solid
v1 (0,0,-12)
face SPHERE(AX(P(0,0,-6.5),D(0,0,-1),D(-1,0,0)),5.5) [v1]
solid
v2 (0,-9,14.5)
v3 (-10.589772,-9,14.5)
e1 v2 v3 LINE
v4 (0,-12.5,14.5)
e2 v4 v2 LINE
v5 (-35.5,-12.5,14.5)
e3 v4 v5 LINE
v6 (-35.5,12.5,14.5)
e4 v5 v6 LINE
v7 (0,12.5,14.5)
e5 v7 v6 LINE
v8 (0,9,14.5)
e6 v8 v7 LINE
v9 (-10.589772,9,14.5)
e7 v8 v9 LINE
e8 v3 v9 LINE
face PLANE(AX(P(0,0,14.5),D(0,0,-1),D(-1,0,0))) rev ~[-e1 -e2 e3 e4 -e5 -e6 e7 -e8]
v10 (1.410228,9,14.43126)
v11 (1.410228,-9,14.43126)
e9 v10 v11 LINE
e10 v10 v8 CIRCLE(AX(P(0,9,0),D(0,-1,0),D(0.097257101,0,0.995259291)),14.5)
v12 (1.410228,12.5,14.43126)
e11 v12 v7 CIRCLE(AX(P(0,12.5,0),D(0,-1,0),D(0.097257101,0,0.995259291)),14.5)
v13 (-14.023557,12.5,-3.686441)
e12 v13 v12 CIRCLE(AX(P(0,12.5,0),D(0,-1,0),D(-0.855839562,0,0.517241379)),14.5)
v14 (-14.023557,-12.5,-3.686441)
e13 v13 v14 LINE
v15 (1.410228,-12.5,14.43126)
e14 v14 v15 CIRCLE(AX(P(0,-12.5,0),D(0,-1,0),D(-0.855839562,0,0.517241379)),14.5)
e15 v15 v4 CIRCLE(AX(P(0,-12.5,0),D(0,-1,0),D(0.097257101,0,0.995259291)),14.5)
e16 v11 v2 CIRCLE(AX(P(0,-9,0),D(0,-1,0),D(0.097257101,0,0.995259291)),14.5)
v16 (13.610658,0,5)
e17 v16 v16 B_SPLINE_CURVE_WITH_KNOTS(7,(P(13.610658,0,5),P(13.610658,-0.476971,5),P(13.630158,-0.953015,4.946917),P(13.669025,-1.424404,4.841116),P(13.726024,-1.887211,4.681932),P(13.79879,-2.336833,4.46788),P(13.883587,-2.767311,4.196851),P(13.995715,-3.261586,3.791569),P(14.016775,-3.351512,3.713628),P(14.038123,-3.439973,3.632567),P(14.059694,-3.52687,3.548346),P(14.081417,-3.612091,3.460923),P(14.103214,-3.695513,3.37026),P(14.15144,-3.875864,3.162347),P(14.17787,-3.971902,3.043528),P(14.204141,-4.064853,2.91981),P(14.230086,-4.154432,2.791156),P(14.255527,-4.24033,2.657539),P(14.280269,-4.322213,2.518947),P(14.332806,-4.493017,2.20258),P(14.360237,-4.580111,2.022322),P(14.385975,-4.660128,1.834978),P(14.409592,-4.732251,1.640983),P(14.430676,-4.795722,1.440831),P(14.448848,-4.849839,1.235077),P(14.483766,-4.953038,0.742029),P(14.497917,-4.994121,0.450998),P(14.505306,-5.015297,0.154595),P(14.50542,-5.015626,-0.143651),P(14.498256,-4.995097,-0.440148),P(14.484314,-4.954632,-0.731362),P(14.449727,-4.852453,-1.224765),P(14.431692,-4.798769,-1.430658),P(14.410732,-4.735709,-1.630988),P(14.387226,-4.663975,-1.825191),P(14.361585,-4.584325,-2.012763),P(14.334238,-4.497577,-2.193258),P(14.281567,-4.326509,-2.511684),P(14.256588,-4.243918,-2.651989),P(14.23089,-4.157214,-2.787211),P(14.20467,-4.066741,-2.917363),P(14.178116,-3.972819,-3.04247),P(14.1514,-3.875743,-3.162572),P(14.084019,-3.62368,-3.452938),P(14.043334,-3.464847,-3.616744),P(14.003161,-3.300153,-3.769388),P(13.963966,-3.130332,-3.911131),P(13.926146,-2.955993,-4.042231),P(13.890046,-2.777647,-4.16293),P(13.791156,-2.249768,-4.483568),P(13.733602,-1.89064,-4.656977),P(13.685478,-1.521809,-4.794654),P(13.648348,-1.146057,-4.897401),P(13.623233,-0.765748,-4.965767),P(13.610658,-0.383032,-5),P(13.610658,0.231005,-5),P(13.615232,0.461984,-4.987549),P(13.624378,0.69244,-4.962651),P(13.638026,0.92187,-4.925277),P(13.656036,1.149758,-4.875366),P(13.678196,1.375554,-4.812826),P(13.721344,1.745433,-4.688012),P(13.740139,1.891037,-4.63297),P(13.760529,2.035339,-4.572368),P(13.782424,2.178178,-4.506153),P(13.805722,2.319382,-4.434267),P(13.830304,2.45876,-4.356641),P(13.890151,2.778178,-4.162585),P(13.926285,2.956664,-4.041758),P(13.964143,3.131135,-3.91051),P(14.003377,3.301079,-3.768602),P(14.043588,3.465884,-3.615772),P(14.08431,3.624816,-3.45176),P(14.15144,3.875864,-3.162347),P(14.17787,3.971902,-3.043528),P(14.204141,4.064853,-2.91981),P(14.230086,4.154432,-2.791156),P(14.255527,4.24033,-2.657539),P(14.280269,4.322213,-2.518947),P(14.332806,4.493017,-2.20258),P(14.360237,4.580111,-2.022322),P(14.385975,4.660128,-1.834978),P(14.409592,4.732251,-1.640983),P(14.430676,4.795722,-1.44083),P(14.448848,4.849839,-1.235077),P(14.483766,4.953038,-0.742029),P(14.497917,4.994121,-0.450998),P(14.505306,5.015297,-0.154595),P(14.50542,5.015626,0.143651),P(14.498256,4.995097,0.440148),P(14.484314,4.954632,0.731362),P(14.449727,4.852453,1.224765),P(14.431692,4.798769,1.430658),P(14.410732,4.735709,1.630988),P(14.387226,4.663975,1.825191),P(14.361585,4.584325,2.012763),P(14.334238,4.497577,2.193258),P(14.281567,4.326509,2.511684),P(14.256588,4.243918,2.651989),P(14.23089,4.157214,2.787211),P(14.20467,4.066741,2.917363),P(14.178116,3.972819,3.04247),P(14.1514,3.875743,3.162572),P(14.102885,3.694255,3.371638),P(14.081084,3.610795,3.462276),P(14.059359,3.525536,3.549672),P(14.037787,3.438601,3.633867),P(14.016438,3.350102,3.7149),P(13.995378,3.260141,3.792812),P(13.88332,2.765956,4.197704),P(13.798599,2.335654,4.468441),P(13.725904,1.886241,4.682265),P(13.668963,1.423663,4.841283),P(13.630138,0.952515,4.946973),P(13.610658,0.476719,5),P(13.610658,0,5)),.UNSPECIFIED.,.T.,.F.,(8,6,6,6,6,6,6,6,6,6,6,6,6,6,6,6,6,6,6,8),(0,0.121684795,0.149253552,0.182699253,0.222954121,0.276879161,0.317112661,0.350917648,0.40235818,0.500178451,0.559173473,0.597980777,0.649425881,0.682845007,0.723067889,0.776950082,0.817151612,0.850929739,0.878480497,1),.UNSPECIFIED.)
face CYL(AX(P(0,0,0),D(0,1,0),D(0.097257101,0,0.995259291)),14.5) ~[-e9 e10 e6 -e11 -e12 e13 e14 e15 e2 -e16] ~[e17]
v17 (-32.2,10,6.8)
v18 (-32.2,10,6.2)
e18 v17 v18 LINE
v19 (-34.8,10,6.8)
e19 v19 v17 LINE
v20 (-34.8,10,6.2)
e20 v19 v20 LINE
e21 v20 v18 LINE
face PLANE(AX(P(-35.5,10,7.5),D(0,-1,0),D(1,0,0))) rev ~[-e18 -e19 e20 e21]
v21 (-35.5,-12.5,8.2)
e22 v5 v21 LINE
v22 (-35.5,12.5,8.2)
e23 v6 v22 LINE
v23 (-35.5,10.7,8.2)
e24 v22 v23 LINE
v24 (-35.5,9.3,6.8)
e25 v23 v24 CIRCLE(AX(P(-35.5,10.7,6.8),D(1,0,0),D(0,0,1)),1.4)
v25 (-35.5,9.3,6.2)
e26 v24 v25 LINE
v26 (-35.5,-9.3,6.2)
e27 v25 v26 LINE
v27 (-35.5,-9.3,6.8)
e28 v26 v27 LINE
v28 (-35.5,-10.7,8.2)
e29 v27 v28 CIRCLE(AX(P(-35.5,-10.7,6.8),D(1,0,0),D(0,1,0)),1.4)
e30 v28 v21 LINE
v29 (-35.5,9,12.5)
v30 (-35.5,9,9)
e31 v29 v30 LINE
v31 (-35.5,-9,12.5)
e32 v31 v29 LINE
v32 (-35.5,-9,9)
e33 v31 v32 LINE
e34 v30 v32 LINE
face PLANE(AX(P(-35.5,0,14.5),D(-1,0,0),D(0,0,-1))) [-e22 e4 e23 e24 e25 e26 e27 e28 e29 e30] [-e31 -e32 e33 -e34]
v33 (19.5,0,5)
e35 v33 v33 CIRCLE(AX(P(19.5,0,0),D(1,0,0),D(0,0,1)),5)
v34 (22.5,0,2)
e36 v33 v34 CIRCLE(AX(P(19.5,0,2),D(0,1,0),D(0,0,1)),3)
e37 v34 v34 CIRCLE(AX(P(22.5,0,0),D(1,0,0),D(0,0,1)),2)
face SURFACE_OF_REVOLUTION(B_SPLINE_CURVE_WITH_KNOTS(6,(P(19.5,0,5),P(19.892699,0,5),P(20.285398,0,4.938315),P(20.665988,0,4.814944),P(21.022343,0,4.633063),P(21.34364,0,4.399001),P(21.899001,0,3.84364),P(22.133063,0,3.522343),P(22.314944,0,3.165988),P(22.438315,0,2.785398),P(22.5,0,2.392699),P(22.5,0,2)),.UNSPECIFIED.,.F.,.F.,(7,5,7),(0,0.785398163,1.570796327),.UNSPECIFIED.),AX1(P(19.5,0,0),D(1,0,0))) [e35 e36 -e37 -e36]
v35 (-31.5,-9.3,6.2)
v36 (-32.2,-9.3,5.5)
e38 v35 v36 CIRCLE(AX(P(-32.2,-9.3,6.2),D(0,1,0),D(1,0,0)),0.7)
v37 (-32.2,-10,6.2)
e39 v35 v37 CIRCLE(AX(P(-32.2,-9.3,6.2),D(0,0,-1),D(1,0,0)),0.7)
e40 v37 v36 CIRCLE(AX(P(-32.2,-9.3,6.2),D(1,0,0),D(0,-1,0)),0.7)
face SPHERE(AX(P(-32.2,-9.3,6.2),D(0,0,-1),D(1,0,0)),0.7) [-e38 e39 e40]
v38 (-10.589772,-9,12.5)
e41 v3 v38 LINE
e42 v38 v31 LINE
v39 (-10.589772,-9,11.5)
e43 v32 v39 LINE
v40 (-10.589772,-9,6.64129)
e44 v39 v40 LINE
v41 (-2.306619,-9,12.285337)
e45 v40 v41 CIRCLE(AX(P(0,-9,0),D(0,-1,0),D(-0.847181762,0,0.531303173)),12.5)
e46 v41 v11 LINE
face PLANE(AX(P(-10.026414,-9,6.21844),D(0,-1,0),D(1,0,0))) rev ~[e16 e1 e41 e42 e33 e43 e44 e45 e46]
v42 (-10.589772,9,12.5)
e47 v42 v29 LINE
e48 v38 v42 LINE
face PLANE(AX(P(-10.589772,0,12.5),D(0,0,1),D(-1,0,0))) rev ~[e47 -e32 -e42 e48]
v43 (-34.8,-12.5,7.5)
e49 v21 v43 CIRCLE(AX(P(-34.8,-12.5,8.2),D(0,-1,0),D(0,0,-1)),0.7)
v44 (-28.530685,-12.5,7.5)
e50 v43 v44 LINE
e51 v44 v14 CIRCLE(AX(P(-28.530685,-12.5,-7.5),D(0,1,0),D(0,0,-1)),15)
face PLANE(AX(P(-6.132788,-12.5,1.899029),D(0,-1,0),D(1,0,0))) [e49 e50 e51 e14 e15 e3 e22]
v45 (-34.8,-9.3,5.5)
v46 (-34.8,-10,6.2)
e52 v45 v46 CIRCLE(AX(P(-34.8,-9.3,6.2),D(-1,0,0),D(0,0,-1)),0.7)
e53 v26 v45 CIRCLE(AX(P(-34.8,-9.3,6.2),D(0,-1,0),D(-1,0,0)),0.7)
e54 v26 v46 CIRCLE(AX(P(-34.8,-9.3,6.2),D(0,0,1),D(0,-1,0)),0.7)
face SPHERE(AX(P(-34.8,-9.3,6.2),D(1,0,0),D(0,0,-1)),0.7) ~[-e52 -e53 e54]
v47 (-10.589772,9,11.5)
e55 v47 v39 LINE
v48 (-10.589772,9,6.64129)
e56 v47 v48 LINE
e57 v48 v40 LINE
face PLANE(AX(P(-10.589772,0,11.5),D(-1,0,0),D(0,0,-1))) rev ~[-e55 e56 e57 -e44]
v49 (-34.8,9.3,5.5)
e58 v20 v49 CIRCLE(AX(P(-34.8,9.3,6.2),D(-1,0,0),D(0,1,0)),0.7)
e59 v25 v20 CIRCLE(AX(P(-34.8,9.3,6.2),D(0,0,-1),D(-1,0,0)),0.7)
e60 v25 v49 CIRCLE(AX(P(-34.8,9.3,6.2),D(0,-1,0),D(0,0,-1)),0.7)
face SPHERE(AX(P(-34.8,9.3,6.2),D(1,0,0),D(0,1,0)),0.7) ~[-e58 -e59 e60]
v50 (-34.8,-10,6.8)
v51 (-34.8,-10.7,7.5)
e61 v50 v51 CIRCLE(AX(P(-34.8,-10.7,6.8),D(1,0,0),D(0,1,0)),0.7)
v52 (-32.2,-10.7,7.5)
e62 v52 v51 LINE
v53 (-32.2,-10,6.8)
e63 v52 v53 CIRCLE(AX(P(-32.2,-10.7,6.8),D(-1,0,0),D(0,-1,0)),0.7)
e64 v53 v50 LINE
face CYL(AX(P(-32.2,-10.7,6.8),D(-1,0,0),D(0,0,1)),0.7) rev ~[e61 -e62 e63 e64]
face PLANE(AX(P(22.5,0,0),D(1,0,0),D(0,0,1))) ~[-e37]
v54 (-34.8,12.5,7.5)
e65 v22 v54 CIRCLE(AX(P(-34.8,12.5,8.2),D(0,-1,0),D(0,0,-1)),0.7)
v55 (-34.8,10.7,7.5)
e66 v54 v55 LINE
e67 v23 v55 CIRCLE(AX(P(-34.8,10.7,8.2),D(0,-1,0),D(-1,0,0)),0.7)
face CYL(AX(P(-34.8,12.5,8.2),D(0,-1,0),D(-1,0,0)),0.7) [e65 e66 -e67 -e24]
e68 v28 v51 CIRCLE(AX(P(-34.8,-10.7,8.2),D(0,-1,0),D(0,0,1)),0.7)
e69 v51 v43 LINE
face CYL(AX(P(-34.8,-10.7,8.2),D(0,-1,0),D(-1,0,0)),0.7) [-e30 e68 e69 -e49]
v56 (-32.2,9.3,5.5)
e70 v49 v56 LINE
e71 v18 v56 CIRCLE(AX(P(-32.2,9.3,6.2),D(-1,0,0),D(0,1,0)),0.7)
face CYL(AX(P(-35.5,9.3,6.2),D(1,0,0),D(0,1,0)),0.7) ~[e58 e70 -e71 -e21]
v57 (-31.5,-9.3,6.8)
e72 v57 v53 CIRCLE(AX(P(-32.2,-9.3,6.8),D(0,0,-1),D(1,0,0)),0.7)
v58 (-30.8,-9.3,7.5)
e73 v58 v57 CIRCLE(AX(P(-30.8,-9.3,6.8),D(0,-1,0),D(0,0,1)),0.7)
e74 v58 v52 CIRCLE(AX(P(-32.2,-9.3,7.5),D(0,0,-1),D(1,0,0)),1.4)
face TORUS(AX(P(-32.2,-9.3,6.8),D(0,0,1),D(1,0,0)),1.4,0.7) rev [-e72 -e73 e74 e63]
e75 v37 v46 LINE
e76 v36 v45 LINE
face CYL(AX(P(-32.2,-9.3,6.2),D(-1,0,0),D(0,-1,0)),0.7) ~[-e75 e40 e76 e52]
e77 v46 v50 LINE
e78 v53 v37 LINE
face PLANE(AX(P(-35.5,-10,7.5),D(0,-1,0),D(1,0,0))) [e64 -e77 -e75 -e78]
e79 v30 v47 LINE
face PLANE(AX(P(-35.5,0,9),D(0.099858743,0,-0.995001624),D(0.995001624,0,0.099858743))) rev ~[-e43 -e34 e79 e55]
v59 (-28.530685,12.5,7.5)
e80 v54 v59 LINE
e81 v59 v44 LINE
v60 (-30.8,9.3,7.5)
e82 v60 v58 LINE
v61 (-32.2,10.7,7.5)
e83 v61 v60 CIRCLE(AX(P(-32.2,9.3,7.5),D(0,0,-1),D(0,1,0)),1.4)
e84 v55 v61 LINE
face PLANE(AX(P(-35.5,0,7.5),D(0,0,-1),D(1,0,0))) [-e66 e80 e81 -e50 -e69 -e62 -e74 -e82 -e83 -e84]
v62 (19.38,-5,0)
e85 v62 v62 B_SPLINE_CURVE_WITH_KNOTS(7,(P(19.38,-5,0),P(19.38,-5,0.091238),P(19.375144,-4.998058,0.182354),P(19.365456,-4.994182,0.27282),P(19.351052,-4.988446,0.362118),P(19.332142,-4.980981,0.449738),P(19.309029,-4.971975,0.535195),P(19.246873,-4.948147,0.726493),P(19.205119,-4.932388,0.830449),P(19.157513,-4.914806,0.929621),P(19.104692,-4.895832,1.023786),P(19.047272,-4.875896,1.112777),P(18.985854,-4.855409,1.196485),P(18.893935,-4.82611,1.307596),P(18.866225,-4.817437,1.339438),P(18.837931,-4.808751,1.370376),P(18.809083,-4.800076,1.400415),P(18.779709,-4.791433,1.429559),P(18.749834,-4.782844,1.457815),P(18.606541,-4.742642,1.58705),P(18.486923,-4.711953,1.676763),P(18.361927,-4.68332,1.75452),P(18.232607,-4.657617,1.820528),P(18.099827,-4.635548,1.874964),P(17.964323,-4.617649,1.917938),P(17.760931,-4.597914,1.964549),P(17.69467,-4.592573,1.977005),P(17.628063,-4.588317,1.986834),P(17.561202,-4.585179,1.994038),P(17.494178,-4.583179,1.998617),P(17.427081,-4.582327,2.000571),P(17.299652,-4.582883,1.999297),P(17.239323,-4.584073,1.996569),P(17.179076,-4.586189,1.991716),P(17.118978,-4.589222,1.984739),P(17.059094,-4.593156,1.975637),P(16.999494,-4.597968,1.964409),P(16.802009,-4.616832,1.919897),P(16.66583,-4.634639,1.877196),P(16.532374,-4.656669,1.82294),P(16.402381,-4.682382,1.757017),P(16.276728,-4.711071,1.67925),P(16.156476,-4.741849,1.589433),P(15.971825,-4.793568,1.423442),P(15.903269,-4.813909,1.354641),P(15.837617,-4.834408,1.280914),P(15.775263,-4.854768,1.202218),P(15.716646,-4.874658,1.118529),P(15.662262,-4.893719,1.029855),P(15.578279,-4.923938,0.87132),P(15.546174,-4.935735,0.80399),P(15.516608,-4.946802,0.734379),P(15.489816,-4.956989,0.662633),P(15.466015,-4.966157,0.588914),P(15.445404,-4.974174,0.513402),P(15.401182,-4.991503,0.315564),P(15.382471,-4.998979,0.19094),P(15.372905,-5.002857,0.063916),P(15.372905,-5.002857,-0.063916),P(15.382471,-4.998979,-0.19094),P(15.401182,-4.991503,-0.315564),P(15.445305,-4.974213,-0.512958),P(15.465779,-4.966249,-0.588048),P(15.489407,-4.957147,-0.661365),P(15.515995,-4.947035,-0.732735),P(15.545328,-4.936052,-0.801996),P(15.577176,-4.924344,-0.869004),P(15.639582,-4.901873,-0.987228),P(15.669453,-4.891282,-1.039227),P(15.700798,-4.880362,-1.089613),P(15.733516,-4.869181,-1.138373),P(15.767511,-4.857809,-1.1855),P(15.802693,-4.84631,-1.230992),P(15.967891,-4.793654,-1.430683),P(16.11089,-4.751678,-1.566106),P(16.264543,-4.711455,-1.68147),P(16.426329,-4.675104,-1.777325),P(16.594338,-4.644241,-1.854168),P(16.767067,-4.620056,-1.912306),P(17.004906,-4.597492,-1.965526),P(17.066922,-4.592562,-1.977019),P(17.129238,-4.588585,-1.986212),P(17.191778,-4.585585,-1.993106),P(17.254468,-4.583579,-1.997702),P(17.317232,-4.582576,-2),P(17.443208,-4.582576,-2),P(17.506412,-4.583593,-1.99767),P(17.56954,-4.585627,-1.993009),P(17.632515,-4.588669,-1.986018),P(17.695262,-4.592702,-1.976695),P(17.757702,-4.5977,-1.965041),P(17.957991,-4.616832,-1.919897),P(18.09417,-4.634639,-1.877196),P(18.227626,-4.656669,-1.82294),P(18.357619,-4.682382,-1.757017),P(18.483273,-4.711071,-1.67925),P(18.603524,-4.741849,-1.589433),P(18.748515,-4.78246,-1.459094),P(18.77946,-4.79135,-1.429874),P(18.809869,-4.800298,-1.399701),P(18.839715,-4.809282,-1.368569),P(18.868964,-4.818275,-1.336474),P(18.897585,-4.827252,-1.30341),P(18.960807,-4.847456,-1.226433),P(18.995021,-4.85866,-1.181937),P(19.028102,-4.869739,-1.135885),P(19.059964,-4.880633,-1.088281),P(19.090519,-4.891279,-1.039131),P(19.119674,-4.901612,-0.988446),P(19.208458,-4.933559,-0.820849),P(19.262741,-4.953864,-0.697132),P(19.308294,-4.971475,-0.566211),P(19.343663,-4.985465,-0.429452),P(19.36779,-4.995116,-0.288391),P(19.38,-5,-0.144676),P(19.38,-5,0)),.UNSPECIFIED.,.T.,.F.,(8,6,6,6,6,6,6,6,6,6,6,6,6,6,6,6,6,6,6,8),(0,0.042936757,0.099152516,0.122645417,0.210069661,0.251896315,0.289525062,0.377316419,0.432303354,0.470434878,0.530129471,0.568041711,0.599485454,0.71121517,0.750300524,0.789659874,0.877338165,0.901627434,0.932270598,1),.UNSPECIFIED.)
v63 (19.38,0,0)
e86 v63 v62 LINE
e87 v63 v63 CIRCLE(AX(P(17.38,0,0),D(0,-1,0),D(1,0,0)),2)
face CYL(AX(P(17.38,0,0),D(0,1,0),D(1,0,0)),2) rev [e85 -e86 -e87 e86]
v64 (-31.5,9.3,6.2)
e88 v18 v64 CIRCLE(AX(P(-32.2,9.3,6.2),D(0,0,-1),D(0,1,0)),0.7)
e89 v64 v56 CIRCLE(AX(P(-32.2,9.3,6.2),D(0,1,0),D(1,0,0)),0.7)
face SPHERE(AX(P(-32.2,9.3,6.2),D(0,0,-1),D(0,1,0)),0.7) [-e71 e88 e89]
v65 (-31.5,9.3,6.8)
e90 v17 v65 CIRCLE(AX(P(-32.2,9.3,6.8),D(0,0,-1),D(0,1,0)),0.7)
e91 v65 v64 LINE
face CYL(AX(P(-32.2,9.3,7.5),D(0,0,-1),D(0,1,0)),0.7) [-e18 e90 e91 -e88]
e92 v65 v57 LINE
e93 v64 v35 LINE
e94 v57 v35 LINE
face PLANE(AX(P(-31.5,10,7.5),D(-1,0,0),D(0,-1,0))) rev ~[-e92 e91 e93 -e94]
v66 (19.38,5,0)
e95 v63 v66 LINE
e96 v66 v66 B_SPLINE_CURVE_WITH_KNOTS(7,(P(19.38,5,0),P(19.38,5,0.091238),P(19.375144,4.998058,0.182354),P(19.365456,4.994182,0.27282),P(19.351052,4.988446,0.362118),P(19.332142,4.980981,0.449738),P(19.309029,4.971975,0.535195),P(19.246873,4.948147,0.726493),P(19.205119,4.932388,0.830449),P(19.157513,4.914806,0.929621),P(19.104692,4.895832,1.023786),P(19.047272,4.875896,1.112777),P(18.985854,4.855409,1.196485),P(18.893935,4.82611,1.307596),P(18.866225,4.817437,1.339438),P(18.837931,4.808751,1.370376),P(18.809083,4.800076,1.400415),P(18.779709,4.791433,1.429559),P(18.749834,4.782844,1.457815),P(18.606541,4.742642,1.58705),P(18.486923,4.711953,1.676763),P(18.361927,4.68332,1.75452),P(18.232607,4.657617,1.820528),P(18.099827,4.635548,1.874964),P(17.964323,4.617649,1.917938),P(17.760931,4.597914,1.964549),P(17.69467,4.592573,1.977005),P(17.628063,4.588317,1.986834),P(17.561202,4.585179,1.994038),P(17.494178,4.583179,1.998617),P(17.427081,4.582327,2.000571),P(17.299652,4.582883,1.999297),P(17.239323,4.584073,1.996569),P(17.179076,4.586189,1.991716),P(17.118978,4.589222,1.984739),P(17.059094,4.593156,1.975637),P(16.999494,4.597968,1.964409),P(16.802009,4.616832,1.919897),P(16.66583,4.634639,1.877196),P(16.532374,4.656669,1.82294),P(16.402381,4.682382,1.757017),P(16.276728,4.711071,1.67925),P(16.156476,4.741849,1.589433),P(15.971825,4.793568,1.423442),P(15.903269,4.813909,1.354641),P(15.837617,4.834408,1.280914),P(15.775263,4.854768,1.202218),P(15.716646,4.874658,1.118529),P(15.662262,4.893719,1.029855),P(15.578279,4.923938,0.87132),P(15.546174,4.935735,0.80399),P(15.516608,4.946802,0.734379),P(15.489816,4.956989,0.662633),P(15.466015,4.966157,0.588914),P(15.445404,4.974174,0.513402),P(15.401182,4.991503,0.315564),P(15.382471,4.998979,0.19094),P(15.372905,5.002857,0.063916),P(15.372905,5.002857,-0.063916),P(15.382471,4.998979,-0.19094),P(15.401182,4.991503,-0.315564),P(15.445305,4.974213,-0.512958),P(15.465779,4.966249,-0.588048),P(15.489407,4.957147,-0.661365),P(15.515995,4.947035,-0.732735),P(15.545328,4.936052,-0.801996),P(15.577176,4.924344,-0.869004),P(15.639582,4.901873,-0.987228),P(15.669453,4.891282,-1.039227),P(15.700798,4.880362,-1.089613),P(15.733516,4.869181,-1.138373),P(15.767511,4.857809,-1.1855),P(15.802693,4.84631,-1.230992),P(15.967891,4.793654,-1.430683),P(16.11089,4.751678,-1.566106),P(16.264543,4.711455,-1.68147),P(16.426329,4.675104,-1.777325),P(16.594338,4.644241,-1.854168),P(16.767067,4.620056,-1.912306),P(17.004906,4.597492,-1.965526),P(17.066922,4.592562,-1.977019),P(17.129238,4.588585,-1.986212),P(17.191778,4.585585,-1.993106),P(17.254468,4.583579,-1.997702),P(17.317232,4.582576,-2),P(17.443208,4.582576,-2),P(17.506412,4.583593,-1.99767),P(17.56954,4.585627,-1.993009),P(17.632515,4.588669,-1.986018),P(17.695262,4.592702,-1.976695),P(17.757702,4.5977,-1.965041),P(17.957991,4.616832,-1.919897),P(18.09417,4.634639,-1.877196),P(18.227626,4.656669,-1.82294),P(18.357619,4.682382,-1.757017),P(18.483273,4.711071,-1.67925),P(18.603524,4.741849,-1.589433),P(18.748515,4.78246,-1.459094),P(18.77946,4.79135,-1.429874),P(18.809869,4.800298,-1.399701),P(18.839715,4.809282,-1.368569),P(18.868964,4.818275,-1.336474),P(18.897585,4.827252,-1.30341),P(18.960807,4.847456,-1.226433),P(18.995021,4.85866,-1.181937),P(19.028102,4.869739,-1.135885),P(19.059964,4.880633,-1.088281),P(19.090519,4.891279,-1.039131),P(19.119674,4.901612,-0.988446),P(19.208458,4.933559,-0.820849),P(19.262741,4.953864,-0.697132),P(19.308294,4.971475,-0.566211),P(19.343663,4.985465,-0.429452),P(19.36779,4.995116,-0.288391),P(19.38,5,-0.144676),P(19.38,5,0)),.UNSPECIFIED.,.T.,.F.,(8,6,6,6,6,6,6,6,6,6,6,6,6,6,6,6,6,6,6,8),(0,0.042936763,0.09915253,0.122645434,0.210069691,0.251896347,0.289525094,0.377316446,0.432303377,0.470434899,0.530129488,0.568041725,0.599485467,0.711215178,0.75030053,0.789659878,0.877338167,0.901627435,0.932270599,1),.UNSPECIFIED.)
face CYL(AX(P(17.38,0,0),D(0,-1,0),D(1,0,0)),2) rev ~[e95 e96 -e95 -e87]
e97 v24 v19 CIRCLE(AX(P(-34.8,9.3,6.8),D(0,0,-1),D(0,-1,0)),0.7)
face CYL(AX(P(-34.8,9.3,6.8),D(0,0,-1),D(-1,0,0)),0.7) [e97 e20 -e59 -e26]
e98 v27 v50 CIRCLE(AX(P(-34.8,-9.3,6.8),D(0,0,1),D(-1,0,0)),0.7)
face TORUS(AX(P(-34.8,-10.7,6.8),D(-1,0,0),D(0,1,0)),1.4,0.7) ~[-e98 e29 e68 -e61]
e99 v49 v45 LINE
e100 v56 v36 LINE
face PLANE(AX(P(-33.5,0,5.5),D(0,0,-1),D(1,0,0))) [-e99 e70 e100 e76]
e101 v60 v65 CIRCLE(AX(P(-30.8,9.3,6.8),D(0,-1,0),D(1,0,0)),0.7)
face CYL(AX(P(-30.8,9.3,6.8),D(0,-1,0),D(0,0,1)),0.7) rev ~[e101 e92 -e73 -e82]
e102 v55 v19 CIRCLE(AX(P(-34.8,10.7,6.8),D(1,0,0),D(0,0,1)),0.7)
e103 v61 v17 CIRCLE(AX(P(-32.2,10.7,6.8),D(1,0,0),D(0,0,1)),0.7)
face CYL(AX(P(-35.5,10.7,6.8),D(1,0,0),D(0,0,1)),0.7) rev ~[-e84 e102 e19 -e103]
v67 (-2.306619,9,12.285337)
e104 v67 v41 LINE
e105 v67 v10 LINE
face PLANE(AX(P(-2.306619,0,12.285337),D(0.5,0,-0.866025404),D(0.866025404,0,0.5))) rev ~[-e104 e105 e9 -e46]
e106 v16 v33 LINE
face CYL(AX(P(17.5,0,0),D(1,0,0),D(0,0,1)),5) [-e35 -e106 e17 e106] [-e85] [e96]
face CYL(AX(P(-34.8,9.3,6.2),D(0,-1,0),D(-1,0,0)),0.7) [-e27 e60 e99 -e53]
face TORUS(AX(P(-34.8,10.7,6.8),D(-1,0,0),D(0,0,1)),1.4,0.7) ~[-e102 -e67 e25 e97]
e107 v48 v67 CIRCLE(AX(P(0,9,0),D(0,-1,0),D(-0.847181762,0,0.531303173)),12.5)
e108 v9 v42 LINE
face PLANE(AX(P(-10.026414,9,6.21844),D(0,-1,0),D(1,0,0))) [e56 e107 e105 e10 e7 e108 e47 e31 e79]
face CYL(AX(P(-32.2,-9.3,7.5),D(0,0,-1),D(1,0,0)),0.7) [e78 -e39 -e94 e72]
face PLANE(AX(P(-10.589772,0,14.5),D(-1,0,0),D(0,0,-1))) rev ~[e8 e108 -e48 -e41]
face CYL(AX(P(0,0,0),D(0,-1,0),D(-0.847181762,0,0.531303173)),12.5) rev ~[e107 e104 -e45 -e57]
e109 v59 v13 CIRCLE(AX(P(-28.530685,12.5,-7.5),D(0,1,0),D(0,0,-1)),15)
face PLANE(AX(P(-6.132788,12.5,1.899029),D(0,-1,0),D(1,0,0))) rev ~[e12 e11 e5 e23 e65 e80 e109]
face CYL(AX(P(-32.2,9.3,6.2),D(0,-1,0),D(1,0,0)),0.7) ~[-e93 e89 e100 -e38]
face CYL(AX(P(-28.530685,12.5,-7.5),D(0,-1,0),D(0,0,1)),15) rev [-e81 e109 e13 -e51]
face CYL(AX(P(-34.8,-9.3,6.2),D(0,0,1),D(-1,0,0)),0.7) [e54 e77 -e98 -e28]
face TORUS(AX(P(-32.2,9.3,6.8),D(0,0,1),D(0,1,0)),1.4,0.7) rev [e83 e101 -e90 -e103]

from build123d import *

# Parameters (mm, degrees)
F0_W          = 24.9102279718
F0_H          = 2
F1_DEPTH      = 12.5
F2_DEPTH      = 9
F5_W          = 10
F5_H          = 5
F7_R          = 3
F8_R          = 2
F9_DEPTH      = 12.5010001
F9_DEPTH_BACK = 12.5010001
F10_W         = 4
F10_H         = 20
F11_DEPTH     = 2
F12_F1_R      = 0.7
F12_F2_R      = 0.7
F12_F3_R      = 0.7
F12_F4_R      = 0.7
F12_F5_R      = 0.7
F13_R         = 15


with BuildPart() as f1:
    # F0 (on Front) → F1 (new body, symmetric)
    with BuildSketch(Plane.XZ):
        with BuildLine():
            Line((-10.5897720282, 11.5), (-35.5, 9))
            Line((-35.5, 9), (-35.5, 7.5))
            Line((-35.5, 7.5), (-12.409673646, 7.5))
            ThreePointArc((-12.409673646, 7.5), (6.5005800977, -12.9611904698), (1.4102279718, 14.4312597187))
            Line((1.4102279718, 14.4312597187), (-2.3066189308, 12.2853371589))
            ThreePointArc((-2.3066189308, 12.2853371589), (7.0386819061, -10.3299059543), (-10.5897720282, 6.6412896632))
            Line((-10.5897720282, 6.6412896632), (-10.5897720282, 11.5))
        make_face()
        with Locations((-23.0448860141, 13.5)):
            Rectangle(F0_W, F0_H)
        with BuildLine():
            Line((-35.5, 12.5), (-35.5, 9))
            Line((-35.5, 9), (-10.5897720282, 11.5))
            Line((-10.5897720282, 11.5), (-10.5897720282, 6.6412896632))
            ThreePointArc((-10.5897720282, 6.6412896632), (7.0386819061, -10.3299059543), (-2.3066189308, 12.2853371589))
            Line((-2.3066189308, 12.2853371589), (1.4102279718, 14.4312597187))
            ThreePointArc((1.4102279718, 14.4312597187), (0.7059511596, 14.4828047339), (0, 14.5))
            Line((0, 14.5), (-10.5897720282, 14.5))
            Line((-10.5897720282, 14.5), (-10.5897720282, 12.5))
            Line((-10.5897720282, 12.5), (-35.5, 12.5))
        make_face()
    extrude(amount=F1_DEPTH, both=True)

    # F0 (on Front) → F2 (cut, symmetric)
    with BuildSketch(Plane.XZ):
        with BuildLine():
            Line((-35.5, 12.5), (-35.5, 9))
            Line((-35.5, 9), (-10.5897720282, 11.5))
            Line((-10.5897720282, 11.5), (-10.5897720282, 6.6412896632))
            ThreePointArc((-10.5897720282, 6.6412896632), (7.0386819061, -10.3299059543), (-2.3066189308, 12.2853371589))
            Line((-2.3066189308, 12.2853371589), (1.4102279718, 14.4312597187))
            ThreePointArc((1.4102279718, 14.4312597187), (0.7059511596, 14.4828047339), (0, 14.5))
            Line((0, 14.5), (-10.5897720282, 14.5))
            Line((-10.5897720282, 14.5), (-10.5897720282, 12.5))
            Line((-10.5897720282, 12.5), (-35.5, 12.5))
        make_face()
    extrude(amount=F2_DEPTH, both=True, mode=Mode.SUBTRACT)

    # F5 (on Front) → F6 (revolve)
    with BuildSketch(Plane.XZ):
        with Locations((17.5, 2.5)):
            Rectangle(F5_W, F5_H)
    revolve(axis=Axis((17.5, 0, 0), (1, 0, 0)))

    # F7
    f7_edges = [f1.edges().sort_by_distance(p)[0] for p in [
        (22.5, 0, -5),
    ]]
    fillet(f7_edges, radius=F7_R)

    # F8 (on Front) → F9 (cut, two sides)
    with BuildSketch(Plane.XZ) as f9_sk:
        with Locations((17.38, 0)):
            Circle(F8_R)
    extrude(amount=F9_DEPTH, mode=Mode.SUBTRACT)
    extrude(f9_sk.sketch, amount=-F9_DEPTH_BACK, mode=Mode.SUBTRACT)

    # F10 (on face) → F11 (join)
    with BuildSketch(Plane(origin=(0, 0, 7.5), x_dir=(1, 0, 0), z_dir=(0, 0, -1))):
        with Locations((-33.5, 0)):
            Rectangle(F10_W, F10_H)
    extrude(amount=F11_DEPTH)

    # F12: fillet of radius 0.7 on 11 edges, made by hand

    # F12_f1
    f12_f1_edges = [f1.edges().sort_by_distance(p)[0] for p in [
        (-31.5, 10, 6.5),
    ]]
    fillet(f12_f1_edges, radius=F12_F1_R)

    # F12_f2
    f12_f2_edges = [f1.edges().sort_by_distance(p)[0] for p in [
        (-31.5, -10, 6.5),
    ]]
    fillet(f12_f2_edges, radius=F12_F2_R)

    # F12_f3
    f12_f3_edges = [f1.edges().sort_by_distance(p)[0] for p in [
        (-33.85, 10, 7.5),
    ]]
    fillet(f12_f3_edges, radius=F12_F3_R)

    # F12_f4
    f12_f4_edges = [f1.edges().sort_by_distance(p)[0] for p in [
        (-33.85, 10, 5.5),
    ]]
    fillet(f12_f4_edges, radius=F12_F4_R)

    # F12_f5
    f12_f5_edges = [f1.edges().sort_by_distance(p)[0] for p in [
        (-35.5, 0, 5.5),
    ]]
    fillet(f12_f5_edges, radius=F12_F5_R)

    # F13
    f13_edges = [f1.edges().sort_by_distance(p)[0] for p in [
        (-12.409674, 0, 7.5),
    ]]
    fillet(f13_edges, radius=F13_R)


with BuildPart() as f4:
    # F3 (on Front) → F4 (revolve)
    with BuildSketch(Plane.XZ):
        with BuildLine():
            Line((0, -12), (0, -1))
            ThreePointArc((0, -1), (-5.5, -6.5), (0, -12))
        make_face()
    revolve(axis=Axis((0, 0, -6.5), (0, 0, -1)))


solid = Compound([f1.part, f4.part])
